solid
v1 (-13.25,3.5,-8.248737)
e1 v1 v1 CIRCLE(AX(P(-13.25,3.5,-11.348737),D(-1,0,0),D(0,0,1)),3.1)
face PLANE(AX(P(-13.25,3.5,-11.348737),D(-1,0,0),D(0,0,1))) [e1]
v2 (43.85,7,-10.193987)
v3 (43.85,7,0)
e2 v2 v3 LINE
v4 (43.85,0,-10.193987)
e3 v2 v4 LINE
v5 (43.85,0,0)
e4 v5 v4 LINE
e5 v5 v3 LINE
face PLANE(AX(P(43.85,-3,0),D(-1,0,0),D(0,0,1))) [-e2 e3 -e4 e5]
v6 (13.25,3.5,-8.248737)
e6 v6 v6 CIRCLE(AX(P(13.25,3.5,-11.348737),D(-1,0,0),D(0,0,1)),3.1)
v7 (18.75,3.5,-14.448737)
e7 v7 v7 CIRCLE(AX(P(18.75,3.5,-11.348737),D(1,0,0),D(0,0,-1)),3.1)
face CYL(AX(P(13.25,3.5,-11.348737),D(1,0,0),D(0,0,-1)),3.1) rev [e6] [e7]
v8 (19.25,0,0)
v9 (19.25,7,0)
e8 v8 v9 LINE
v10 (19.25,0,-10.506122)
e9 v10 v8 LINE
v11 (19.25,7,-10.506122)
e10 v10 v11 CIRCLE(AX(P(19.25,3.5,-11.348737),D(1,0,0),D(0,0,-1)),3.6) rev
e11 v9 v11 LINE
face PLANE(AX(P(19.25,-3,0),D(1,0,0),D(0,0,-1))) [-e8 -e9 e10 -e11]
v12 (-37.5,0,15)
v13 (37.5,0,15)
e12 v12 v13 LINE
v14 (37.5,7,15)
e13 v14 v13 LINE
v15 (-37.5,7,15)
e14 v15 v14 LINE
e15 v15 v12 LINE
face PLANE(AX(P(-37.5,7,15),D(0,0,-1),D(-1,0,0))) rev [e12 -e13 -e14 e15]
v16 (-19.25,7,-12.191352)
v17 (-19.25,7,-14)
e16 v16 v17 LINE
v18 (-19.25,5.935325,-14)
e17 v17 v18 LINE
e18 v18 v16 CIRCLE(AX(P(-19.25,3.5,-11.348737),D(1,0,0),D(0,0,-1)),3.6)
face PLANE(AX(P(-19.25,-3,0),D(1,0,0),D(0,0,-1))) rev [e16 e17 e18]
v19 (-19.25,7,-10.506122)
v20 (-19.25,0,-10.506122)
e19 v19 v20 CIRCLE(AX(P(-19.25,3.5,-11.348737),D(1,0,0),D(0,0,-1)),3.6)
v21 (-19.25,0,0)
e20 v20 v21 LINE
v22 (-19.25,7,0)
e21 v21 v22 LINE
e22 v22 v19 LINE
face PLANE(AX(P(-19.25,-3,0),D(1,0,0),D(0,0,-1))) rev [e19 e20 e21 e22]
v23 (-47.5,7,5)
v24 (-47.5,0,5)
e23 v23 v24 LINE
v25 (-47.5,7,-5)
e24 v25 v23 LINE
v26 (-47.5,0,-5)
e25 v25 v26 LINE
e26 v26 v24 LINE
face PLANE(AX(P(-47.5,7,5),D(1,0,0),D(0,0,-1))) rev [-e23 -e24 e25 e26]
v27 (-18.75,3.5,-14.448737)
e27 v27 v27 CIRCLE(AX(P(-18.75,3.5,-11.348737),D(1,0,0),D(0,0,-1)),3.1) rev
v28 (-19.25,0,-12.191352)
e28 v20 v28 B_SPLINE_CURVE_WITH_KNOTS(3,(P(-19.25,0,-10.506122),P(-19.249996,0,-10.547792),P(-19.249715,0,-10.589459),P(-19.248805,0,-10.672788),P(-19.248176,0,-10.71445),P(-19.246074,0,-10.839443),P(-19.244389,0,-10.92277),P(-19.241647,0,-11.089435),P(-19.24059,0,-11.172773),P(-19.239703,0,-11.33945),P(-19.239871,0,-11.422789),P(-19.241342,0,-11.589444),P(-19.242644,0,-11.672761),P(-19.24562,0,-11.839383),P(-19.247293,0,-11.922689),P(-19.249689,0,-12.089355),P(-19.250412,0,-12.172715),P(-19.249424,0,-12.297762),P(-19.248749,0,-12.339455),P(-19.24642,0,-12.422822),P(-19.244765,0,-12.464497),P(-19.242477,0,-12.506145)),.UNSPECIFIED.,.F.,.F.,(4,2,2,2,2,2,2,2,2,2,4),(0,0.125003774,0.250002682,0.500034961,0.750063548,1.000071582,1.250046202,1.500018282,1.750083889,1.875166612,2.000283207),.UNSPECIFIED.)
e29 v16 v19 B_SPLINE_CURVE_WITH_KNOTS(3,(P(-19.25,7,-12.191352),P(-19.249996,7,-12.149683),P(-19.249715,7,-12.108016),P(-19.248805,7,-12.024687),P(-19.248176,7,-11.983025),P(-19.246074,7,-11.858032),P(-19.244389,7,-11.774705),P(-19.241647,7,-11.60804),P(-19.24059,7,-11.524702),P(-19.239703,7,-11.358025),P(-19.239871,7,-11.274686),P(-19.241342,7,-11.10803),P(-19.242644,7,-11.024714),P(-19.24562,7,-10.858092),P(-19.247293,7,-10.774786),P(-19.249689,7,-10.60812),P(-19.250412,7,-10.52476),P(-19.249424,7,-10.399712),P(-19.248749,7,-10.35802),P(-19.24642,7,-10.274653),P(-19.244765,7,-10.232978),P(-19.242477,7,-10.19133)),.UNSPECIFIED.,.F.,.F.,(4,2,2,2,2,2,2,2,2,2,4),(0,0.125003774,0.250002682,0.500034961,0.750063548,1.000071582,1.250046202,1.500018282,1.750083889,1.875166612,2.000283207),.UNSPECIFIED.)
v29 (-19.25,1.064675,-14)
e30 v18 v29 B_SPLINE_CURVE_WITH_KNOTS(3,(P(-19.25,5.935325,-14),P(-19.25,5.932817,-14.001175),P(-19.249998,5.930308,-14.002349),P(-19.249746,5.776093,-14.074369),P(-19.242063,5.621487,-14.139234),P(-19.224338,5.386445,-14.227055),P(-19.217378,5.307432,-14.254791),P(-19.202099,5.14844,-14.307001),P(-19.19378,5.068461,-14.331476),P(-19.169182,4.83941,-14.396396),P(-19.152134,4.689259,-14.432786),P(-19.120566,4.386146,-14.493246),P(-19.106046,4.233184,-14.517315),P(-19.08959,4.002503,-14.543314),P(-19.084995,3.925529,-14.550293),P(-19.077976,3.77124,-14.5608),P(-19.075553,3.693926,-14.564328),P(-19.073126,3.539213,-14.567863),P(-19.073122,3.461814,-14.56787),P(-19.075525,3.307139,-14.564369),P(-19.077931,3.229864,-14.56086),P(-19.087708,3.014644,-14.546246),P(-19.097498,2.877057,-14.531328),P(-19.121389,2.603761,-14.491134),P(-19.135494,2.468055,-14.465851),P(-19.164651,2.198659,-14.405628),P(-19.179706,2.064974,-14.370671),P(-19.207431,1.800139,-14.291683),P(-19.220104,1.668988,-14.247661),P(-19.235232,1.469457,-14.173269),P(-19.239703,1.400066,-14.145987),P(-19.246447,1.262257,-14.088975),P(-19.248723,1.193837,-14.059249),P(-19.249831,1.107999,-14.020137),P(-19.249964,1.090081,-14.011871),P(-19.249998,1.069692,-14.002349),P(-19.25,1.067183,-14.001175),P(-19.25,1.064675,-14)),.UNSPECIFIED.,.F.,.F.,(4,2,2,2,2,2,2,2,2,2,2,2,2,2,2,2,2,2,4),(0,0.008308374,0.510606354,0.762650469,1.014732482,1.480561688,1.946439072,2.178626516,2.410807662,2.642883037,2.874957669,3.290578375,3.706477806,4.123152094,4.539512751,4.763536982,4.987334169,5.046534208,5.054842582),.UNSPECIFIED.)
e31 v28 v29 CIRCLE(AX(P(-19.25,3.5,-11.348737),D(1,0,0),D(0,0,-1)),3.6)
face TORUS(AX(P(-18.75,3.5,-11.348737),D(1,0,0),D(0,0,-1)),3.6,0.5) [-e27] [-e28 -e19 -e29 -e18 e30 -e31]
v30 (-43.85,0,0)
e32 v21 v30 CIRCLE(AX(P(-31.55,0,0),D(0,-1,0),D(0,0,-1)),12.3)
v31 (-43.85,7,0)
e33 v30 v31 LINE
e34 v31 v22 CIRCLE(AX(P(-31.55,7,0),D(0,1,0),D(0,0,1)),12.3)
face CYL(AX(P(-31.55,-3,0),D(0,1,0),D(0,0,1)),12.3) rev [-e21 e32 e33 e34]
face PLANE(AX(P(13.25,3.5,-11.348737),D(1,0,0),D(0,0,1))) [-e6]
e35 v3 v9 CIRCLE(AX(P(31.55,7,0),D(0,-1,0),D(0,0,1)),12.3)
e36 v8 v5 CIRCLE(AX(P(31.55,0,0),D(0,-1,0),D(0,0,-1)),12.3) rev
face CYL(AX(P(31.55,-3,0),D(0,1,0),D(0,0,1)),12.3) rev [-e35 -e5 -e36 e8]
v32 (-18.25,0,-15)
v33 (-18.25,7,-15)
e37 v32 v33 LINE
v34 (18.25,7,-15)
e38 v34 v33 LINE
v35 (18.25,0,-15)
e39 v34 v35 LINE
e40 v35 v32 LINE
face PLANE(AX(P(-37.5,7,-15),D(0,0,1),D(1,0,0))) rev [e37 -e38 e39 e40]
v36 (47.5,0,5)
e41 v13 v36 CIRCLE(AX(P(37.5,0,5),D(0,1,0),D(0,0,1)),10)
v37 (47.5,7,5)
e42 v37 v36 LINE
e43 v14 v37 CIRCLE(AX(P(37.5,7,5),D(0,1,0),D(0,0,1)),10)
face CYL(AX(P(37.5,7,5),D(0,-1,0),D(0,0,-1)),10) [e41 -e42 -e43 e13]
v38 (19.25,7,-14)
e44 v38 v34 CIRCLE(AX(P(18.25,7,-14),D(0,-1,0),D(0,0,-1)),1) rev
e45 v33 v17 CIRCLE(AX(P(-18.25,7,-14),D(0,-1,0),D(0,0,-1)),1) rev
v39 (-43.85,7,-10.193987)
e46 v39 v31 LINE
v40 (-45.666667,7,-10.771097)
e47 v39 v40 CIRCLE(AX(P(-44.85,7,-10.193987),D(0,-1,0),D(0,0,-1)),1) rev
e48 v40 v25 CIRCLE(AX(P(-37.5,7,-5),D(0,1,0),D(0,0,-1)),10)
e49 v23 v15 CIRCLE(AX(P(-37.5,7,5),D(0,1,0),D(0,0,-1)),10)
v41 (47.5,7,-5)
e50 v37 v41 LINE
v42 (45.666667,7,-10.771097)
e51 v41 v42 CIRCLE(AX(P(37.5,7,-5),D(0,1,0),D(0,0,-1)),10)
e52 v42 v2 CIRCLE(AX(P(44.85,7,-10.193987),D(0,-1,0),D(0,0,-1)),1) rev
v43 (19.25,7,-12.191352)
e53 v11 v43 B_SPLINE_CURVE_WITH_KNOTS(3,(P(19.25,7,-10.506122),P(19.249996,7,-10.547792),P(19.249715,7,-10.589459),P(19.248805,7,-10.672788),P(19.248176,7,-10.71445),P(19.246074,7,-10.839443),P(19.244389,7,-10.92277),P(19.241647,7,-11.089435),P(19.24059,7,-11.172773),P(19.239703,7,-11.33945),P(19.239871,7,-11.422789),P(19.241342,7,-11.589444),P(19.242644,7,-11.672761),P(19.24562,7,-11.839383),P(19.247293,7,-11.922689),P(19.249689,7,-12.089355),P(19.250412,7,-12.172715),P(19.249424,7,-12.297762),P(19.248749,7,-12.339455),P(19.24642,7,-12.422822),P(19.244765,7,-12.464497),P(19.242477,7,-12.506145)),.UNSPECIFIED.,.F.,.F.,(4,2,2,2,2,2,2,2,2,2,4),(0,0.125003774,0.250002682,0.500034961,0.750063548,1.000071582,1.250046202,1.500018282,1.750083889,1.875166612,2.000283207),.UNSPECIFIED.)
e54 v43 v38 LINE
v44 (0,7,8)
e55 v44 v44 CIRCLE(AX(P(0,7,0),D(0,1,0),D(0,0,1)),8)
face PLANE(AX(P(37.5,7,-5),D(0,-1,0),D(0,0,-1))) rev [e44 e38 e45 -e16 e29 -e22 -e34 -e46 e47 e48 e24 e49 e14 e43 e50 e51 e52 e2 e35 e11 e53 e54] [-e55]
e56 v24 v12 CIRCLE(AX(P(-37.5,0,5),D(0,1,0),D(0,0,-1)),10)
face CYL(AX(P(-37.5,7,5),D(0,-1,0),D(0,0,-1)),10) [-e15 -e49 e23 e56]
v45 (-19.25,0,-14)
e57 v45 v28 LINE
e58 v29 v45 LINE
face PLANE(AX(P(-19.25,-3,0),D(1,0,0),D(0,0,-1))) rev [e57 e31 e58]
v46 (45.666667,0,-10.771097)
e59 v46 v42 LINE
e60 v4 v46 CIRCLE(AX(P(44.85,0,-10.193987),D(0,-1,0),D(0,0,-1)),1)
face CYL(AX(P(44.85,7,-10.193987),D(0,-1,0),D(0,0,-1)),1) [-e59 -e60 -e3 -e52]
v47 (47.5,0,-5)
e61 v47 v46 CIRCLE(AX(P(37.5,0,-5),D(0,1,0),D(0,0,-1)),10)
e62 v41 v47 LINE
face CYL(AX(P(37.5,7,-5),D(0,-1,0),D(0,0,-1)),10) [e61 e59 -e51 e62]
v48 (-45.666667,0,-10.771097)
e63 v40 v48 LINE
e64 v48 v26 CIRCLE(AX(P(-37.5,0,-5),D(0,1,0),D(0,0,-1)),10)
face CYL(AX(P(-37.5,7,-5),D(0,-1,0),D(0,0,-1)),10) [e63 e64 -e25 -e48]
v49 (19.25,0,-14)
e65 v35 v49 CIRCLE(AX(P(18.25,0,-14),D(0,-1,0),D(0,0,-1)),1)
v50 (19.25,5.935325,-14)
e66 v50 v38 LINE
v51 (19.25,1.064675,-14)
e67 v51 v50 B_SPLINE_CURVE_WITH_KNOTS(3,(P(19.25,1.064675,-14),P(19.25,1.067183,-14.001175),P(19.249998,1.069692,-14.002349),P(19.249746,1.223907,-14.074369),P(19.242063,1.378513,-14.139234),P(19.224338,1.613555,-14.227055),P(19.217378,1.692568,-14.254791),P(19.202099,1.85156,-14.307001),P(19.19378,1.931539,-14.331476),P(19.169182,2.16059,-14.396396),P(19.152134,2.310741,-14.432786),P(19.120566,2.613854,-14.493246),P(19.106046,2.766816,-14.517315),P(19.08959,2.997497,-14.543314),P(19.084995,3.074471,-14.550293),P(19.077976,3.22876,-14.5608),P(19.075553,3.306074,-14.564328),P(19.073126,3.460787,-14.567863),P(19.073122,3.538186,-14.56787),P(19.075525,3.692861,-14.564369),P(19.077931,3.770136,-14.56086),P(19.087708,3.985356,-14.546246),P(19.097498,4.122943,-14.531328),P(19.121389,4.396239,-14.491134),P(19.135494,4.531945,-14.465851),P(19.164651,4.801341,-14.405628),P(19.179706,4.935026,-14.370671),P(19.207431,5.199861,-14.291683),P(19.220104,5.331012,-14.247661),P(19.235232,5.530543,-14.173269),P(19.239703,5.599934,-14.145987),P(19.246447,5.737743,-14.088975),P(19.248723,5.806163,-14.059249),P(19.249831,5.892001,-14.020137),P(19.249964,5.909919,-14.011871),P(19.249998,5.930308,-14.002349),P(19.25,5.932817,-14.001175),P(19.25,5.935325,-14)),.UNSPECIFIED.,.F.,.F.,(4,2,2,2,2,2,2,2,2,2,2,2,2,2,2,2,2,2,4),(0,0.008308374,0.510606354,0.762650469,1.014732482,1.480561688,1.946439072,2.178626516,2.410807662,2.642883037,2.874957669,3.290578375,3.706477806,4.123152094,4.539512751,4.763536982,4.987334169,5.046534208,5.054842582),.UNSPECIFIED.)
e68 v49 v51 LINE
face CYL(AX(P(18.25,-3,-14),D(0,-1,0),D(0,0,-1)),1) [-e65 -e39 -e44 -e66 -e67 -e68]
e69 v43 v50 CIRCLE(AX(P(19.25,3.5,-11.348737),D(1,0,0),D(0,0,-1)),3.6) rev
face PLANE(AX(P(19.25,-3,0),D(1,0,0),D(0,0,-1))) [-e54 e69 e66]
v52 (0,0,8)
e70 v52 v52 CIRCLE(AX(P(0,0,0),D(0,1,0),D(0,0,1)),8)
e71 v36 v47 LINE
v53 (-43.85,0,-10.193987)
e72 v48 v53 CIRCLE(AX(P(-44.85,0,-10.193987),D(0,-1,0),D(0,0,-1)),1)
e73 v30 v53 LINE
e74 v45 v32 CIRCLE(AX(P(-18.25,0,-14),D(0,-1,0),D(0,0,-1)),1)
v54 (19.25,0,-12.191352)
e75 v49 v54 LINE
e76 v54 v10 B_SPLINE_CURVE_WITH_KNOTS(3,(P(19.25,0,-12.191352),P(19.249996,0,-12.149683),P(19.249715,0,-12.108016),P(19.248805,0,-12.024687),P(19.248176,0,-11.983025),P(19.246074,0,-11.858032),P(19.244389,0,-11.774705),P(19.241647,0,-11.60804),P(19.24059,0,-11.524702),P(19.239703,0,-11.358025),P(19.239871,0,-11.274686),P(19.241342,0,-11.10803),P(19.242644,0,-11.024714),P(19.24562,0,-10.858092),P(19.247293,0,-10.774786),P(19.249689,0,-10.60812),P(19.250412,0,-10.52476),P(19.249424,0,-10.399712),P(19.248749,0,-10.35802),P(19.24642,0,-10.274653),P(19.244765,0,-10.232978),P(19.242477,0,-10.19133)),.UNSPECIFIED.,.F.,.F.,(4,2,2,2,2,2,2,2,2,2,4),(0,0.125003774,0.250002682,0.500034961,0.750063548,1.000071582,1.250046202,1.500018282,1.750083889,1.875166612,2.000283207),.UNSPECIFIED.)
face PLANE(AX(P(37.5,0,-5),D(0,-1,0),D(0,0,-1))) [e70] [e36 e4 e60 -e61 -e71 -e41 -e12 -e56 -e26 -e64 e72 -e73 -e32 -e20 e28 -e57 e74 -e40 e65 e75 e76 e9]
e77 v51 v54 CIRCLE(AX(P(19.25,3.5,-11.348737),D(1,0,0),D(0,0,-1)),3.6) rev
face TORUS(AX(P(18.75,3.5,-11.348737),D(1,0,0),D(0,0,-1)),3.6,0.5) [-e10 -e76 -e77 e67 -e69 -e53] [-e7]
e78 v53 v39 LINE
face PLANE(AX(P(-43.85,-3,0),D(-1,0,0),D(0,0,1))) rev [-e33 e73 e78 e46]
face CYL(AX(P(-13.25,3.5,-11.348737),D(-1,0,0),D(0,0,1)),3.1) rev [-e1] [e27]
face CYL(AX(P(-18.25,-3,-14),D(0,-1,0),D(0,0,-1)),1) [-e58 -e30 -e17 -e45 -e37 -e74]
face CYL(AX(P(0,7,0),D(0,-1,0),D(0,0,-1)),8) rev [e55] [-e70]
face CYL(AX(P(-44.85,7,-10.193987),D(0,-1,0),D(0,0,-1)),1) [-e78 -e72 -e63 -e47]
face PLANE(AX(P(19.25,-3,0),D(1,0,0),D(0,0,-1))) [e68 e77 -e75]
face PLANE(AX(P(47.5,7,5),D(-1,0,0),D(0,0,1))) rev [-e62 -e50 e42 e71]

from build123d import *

# Parameters (mm, degrees)
SKETCH1_R           = 8
BOSS_EXTRUDE1_DEPTH = 7
CUT_EXTRUDE1_DEPTH  = 10
SKETCH3_R           = 3.1
CUT_EXTRUDE2_DEPTH  = 6
FILLET1_R           = 0.5
FILLET2_R           = 1
FILLET3_R           = 1
FILLET5_R           = 1
FILLET6_R           = 0.5
FILLET7_R           = 1


with BuildPart() as part:
    # Sketch1 → Boss-Extrude1 (new body)
    with BuildSketch(Plane(origin=(0, 0, 0), x_dir=(1, 0, 0), z_dir=(0, 1, 0))):
        with BuildLine():
            Line((-37.5, -15), (37.5, -15))
            ThreePointArc((37.5, -15), (44.571067812, -12.071067812), (47.5, -5))
            Line((47.5, -5), (47.5, 5))
            ThreePointArc((47.5, 5), (44.571067812, 12.071067812), (37.5, 15))
            Line((37.5, 15), (-37.5, 15))
            ThreePointArc((-37.5, 15), (-44.571067812, 12.071067812), (-47.5, 5))
            Line((-47.5, 5), (-47.5, -5))
            ThreePointArc((-47.5, -5), (-44.571067812, -12.071067812), (-37.5, -15))
        make_face()
        with Locations(Location((0, 0, 0), (0, 0, 270))):
            Circle(SKETCH1_R, mode=Mode.SUBTRACT)
    extrude(amount=BOSS_EXTRUDE1_DEPTH)

    # Sketch2 → Cut-Extrude1 (cut)
    with BuildSketch(Plane(origin=(0, 7, 0), x_dir=(1, 0, 0), z_dir=(0, 1, 0))):
        with BuildLine():
            Line((-19.25, 0), (-19.25, 15))
            Line((-19.25, 15), (-43.85, 15))
            Line((-43.85, 15), (-43.85, 0))
            ThreePointArc((-43.85, 0), (-31.55, -12.3), (-19.25, 0))
        make_face()
    cut_extrude1 = extrude(amount=-CUT_EXTRUDE1_DEPTH, mode=Mode.SUBTRACT)

    # Sketch3 → Cut-Extrude2 (cut)
    with BuildSketch(Plane.ZY.offset(19.25)):
        with Locations((-11.34873736, 3.5)):
            Circle(SKETCH3_R)
    cut_extrude2 = extrude(amount=-CUT_EXTRUDE2_DEPTH, mode=Mode.SUBTRACT)

    # Fillet1
    # the kernel refuses this fillet: 0.5 mm, written as the material it takes off along each edge
    with BuildSketch(Plane(origin=(-19.25, 3.5, -11.34873736), x_dir=(0, 0, 1), z_dir=(0, -1, 0))) as fillet1_piece_1:
        with BuildLine():
            CenterArc((3.1 + FILLET1_R, -FILLET1_R), FILLET1_R, 90, 90)
            Line((3.1, -FILLET1_R), (3.1, 0))
            Line((3.1, 0), (3.1 + FILLET1_R, 0))
        make_face()
    revolve(axis=Axis((-19.25, 3.5, -11.34873736), (-1, 0, 0)), mode=Mode.SUBTRACT)

    # Fillet2
    fillet2_edges = [part.edges().sort_by_distance(p)[0] for p in [
        (-43.85, 3.5, -12.725121358),
    ]]
    fillet(fillet2_edges, radius=FILLET2_R)

    # Fillet3
    # the kernel refuses this fillet: 1 mm, written as the material it takes off along each edge
    with BuildSketch(Plane(origin=(-19.25, 9.5, -15), x_dir=(0, 0, 1), z_dir=(0, -1, 0))) as fillet3_piece_1:
        with BuildLine():
            CenterArc((FILLET3_R, -FILLET3_R), FILLET3_R, 90, 90)
            Line((0, -FILLET3_R), (-FILLET3_R * 0.02, -FILLET3_R))
            Line((-FILLET3_R * 0.02, -FILLET3_R), (-FILLET3_R * 0.02, FILLET3_R * 0.02))
            Line((-FILLET3_R * 0.02, FILLET3_R * 0.02), (FILLET3_R, FILLET3_R * 0.02))
            Line((FILLET3_R, FILLET3_R * 0.02), (FILLET3_R, 0))
        make_face()
    extrude(amount=12, mode=Mode.SUBTRACT)

    # Mirror5: Cut-Extrude1, Cut-Extrude2 across plane
    add(cut_extrude1.mirror(Plane.ZY), mode=Mode.SUBTRACT)
    add(cut_extrude2.mirror(Plane.ZY), mode=Mode.SUBTRACT)

    # Fillet5
    fillet5_edges = [part.edges().sort_by_distance(p)[0] for p in [
        (43.85, 3.5, -12.725121358),
    ]]
    fillet(fillet5_edges, radius=FILLET5_R)

    # Fillet6
    # the kernel refuses this fillet: 0.5 mm, written as the material it takes off along each edge
    with BuildSketch(Plane(origin=(19.25, 3.5, -11.34873736), x_dir=(0, 0, 1), z_dir=(0, -1, 0))) as fillet6_piece_1:
        with BuildLine():
            CenterArc((3.1 + FILLET6_R, FILLET6_R), FILLET6_R, 180, 90)
            Line((3.1, FILLET6_R), (3.1, 0))
            Line((3.1, 0), (3.1 + FILLET6_R, 0))
        make_face()
    revolve(axis=Axis((19.25, 3.5, -11.34873736), (-1, 0, 0)), mode=Mode.SUBTRACT)

    # Fillet7
    # the kernel refuses this fillet: 1 mm, written as the material it takes off along each edge
    with BuildSketch(Plane(origin=(19.25, 9.5, -15), x_dir=(-1, 0, 0), z_dir=(0, -1, 0))) as fillet7_piece_1:
        with BuildLine():
            CenterArc((FILLET7_R, -FILLET7_R), FILLET7_R, 90, 90)
            Line((0, -FILLET7_R), (-FILLET7_R * 0.02, -FILLET7_R))
            Line((-FILLET7_R * 0.02, -FILLET7_R), (-FILLET7_R * 0.02, FILLET7_R * 0.02))
            Line((-FILLET7_R * 0.02, FILLET7_R * 0.02), (FILLET7_R, FILLET7_R * 0.02))
            Line((FILLET7_R, FILLET7_R * 0.02), (FILLET7_R, 0))
        make_face()
    extrude(amount=12, mode=Mode.SUBTRACT)


solid = part.part
